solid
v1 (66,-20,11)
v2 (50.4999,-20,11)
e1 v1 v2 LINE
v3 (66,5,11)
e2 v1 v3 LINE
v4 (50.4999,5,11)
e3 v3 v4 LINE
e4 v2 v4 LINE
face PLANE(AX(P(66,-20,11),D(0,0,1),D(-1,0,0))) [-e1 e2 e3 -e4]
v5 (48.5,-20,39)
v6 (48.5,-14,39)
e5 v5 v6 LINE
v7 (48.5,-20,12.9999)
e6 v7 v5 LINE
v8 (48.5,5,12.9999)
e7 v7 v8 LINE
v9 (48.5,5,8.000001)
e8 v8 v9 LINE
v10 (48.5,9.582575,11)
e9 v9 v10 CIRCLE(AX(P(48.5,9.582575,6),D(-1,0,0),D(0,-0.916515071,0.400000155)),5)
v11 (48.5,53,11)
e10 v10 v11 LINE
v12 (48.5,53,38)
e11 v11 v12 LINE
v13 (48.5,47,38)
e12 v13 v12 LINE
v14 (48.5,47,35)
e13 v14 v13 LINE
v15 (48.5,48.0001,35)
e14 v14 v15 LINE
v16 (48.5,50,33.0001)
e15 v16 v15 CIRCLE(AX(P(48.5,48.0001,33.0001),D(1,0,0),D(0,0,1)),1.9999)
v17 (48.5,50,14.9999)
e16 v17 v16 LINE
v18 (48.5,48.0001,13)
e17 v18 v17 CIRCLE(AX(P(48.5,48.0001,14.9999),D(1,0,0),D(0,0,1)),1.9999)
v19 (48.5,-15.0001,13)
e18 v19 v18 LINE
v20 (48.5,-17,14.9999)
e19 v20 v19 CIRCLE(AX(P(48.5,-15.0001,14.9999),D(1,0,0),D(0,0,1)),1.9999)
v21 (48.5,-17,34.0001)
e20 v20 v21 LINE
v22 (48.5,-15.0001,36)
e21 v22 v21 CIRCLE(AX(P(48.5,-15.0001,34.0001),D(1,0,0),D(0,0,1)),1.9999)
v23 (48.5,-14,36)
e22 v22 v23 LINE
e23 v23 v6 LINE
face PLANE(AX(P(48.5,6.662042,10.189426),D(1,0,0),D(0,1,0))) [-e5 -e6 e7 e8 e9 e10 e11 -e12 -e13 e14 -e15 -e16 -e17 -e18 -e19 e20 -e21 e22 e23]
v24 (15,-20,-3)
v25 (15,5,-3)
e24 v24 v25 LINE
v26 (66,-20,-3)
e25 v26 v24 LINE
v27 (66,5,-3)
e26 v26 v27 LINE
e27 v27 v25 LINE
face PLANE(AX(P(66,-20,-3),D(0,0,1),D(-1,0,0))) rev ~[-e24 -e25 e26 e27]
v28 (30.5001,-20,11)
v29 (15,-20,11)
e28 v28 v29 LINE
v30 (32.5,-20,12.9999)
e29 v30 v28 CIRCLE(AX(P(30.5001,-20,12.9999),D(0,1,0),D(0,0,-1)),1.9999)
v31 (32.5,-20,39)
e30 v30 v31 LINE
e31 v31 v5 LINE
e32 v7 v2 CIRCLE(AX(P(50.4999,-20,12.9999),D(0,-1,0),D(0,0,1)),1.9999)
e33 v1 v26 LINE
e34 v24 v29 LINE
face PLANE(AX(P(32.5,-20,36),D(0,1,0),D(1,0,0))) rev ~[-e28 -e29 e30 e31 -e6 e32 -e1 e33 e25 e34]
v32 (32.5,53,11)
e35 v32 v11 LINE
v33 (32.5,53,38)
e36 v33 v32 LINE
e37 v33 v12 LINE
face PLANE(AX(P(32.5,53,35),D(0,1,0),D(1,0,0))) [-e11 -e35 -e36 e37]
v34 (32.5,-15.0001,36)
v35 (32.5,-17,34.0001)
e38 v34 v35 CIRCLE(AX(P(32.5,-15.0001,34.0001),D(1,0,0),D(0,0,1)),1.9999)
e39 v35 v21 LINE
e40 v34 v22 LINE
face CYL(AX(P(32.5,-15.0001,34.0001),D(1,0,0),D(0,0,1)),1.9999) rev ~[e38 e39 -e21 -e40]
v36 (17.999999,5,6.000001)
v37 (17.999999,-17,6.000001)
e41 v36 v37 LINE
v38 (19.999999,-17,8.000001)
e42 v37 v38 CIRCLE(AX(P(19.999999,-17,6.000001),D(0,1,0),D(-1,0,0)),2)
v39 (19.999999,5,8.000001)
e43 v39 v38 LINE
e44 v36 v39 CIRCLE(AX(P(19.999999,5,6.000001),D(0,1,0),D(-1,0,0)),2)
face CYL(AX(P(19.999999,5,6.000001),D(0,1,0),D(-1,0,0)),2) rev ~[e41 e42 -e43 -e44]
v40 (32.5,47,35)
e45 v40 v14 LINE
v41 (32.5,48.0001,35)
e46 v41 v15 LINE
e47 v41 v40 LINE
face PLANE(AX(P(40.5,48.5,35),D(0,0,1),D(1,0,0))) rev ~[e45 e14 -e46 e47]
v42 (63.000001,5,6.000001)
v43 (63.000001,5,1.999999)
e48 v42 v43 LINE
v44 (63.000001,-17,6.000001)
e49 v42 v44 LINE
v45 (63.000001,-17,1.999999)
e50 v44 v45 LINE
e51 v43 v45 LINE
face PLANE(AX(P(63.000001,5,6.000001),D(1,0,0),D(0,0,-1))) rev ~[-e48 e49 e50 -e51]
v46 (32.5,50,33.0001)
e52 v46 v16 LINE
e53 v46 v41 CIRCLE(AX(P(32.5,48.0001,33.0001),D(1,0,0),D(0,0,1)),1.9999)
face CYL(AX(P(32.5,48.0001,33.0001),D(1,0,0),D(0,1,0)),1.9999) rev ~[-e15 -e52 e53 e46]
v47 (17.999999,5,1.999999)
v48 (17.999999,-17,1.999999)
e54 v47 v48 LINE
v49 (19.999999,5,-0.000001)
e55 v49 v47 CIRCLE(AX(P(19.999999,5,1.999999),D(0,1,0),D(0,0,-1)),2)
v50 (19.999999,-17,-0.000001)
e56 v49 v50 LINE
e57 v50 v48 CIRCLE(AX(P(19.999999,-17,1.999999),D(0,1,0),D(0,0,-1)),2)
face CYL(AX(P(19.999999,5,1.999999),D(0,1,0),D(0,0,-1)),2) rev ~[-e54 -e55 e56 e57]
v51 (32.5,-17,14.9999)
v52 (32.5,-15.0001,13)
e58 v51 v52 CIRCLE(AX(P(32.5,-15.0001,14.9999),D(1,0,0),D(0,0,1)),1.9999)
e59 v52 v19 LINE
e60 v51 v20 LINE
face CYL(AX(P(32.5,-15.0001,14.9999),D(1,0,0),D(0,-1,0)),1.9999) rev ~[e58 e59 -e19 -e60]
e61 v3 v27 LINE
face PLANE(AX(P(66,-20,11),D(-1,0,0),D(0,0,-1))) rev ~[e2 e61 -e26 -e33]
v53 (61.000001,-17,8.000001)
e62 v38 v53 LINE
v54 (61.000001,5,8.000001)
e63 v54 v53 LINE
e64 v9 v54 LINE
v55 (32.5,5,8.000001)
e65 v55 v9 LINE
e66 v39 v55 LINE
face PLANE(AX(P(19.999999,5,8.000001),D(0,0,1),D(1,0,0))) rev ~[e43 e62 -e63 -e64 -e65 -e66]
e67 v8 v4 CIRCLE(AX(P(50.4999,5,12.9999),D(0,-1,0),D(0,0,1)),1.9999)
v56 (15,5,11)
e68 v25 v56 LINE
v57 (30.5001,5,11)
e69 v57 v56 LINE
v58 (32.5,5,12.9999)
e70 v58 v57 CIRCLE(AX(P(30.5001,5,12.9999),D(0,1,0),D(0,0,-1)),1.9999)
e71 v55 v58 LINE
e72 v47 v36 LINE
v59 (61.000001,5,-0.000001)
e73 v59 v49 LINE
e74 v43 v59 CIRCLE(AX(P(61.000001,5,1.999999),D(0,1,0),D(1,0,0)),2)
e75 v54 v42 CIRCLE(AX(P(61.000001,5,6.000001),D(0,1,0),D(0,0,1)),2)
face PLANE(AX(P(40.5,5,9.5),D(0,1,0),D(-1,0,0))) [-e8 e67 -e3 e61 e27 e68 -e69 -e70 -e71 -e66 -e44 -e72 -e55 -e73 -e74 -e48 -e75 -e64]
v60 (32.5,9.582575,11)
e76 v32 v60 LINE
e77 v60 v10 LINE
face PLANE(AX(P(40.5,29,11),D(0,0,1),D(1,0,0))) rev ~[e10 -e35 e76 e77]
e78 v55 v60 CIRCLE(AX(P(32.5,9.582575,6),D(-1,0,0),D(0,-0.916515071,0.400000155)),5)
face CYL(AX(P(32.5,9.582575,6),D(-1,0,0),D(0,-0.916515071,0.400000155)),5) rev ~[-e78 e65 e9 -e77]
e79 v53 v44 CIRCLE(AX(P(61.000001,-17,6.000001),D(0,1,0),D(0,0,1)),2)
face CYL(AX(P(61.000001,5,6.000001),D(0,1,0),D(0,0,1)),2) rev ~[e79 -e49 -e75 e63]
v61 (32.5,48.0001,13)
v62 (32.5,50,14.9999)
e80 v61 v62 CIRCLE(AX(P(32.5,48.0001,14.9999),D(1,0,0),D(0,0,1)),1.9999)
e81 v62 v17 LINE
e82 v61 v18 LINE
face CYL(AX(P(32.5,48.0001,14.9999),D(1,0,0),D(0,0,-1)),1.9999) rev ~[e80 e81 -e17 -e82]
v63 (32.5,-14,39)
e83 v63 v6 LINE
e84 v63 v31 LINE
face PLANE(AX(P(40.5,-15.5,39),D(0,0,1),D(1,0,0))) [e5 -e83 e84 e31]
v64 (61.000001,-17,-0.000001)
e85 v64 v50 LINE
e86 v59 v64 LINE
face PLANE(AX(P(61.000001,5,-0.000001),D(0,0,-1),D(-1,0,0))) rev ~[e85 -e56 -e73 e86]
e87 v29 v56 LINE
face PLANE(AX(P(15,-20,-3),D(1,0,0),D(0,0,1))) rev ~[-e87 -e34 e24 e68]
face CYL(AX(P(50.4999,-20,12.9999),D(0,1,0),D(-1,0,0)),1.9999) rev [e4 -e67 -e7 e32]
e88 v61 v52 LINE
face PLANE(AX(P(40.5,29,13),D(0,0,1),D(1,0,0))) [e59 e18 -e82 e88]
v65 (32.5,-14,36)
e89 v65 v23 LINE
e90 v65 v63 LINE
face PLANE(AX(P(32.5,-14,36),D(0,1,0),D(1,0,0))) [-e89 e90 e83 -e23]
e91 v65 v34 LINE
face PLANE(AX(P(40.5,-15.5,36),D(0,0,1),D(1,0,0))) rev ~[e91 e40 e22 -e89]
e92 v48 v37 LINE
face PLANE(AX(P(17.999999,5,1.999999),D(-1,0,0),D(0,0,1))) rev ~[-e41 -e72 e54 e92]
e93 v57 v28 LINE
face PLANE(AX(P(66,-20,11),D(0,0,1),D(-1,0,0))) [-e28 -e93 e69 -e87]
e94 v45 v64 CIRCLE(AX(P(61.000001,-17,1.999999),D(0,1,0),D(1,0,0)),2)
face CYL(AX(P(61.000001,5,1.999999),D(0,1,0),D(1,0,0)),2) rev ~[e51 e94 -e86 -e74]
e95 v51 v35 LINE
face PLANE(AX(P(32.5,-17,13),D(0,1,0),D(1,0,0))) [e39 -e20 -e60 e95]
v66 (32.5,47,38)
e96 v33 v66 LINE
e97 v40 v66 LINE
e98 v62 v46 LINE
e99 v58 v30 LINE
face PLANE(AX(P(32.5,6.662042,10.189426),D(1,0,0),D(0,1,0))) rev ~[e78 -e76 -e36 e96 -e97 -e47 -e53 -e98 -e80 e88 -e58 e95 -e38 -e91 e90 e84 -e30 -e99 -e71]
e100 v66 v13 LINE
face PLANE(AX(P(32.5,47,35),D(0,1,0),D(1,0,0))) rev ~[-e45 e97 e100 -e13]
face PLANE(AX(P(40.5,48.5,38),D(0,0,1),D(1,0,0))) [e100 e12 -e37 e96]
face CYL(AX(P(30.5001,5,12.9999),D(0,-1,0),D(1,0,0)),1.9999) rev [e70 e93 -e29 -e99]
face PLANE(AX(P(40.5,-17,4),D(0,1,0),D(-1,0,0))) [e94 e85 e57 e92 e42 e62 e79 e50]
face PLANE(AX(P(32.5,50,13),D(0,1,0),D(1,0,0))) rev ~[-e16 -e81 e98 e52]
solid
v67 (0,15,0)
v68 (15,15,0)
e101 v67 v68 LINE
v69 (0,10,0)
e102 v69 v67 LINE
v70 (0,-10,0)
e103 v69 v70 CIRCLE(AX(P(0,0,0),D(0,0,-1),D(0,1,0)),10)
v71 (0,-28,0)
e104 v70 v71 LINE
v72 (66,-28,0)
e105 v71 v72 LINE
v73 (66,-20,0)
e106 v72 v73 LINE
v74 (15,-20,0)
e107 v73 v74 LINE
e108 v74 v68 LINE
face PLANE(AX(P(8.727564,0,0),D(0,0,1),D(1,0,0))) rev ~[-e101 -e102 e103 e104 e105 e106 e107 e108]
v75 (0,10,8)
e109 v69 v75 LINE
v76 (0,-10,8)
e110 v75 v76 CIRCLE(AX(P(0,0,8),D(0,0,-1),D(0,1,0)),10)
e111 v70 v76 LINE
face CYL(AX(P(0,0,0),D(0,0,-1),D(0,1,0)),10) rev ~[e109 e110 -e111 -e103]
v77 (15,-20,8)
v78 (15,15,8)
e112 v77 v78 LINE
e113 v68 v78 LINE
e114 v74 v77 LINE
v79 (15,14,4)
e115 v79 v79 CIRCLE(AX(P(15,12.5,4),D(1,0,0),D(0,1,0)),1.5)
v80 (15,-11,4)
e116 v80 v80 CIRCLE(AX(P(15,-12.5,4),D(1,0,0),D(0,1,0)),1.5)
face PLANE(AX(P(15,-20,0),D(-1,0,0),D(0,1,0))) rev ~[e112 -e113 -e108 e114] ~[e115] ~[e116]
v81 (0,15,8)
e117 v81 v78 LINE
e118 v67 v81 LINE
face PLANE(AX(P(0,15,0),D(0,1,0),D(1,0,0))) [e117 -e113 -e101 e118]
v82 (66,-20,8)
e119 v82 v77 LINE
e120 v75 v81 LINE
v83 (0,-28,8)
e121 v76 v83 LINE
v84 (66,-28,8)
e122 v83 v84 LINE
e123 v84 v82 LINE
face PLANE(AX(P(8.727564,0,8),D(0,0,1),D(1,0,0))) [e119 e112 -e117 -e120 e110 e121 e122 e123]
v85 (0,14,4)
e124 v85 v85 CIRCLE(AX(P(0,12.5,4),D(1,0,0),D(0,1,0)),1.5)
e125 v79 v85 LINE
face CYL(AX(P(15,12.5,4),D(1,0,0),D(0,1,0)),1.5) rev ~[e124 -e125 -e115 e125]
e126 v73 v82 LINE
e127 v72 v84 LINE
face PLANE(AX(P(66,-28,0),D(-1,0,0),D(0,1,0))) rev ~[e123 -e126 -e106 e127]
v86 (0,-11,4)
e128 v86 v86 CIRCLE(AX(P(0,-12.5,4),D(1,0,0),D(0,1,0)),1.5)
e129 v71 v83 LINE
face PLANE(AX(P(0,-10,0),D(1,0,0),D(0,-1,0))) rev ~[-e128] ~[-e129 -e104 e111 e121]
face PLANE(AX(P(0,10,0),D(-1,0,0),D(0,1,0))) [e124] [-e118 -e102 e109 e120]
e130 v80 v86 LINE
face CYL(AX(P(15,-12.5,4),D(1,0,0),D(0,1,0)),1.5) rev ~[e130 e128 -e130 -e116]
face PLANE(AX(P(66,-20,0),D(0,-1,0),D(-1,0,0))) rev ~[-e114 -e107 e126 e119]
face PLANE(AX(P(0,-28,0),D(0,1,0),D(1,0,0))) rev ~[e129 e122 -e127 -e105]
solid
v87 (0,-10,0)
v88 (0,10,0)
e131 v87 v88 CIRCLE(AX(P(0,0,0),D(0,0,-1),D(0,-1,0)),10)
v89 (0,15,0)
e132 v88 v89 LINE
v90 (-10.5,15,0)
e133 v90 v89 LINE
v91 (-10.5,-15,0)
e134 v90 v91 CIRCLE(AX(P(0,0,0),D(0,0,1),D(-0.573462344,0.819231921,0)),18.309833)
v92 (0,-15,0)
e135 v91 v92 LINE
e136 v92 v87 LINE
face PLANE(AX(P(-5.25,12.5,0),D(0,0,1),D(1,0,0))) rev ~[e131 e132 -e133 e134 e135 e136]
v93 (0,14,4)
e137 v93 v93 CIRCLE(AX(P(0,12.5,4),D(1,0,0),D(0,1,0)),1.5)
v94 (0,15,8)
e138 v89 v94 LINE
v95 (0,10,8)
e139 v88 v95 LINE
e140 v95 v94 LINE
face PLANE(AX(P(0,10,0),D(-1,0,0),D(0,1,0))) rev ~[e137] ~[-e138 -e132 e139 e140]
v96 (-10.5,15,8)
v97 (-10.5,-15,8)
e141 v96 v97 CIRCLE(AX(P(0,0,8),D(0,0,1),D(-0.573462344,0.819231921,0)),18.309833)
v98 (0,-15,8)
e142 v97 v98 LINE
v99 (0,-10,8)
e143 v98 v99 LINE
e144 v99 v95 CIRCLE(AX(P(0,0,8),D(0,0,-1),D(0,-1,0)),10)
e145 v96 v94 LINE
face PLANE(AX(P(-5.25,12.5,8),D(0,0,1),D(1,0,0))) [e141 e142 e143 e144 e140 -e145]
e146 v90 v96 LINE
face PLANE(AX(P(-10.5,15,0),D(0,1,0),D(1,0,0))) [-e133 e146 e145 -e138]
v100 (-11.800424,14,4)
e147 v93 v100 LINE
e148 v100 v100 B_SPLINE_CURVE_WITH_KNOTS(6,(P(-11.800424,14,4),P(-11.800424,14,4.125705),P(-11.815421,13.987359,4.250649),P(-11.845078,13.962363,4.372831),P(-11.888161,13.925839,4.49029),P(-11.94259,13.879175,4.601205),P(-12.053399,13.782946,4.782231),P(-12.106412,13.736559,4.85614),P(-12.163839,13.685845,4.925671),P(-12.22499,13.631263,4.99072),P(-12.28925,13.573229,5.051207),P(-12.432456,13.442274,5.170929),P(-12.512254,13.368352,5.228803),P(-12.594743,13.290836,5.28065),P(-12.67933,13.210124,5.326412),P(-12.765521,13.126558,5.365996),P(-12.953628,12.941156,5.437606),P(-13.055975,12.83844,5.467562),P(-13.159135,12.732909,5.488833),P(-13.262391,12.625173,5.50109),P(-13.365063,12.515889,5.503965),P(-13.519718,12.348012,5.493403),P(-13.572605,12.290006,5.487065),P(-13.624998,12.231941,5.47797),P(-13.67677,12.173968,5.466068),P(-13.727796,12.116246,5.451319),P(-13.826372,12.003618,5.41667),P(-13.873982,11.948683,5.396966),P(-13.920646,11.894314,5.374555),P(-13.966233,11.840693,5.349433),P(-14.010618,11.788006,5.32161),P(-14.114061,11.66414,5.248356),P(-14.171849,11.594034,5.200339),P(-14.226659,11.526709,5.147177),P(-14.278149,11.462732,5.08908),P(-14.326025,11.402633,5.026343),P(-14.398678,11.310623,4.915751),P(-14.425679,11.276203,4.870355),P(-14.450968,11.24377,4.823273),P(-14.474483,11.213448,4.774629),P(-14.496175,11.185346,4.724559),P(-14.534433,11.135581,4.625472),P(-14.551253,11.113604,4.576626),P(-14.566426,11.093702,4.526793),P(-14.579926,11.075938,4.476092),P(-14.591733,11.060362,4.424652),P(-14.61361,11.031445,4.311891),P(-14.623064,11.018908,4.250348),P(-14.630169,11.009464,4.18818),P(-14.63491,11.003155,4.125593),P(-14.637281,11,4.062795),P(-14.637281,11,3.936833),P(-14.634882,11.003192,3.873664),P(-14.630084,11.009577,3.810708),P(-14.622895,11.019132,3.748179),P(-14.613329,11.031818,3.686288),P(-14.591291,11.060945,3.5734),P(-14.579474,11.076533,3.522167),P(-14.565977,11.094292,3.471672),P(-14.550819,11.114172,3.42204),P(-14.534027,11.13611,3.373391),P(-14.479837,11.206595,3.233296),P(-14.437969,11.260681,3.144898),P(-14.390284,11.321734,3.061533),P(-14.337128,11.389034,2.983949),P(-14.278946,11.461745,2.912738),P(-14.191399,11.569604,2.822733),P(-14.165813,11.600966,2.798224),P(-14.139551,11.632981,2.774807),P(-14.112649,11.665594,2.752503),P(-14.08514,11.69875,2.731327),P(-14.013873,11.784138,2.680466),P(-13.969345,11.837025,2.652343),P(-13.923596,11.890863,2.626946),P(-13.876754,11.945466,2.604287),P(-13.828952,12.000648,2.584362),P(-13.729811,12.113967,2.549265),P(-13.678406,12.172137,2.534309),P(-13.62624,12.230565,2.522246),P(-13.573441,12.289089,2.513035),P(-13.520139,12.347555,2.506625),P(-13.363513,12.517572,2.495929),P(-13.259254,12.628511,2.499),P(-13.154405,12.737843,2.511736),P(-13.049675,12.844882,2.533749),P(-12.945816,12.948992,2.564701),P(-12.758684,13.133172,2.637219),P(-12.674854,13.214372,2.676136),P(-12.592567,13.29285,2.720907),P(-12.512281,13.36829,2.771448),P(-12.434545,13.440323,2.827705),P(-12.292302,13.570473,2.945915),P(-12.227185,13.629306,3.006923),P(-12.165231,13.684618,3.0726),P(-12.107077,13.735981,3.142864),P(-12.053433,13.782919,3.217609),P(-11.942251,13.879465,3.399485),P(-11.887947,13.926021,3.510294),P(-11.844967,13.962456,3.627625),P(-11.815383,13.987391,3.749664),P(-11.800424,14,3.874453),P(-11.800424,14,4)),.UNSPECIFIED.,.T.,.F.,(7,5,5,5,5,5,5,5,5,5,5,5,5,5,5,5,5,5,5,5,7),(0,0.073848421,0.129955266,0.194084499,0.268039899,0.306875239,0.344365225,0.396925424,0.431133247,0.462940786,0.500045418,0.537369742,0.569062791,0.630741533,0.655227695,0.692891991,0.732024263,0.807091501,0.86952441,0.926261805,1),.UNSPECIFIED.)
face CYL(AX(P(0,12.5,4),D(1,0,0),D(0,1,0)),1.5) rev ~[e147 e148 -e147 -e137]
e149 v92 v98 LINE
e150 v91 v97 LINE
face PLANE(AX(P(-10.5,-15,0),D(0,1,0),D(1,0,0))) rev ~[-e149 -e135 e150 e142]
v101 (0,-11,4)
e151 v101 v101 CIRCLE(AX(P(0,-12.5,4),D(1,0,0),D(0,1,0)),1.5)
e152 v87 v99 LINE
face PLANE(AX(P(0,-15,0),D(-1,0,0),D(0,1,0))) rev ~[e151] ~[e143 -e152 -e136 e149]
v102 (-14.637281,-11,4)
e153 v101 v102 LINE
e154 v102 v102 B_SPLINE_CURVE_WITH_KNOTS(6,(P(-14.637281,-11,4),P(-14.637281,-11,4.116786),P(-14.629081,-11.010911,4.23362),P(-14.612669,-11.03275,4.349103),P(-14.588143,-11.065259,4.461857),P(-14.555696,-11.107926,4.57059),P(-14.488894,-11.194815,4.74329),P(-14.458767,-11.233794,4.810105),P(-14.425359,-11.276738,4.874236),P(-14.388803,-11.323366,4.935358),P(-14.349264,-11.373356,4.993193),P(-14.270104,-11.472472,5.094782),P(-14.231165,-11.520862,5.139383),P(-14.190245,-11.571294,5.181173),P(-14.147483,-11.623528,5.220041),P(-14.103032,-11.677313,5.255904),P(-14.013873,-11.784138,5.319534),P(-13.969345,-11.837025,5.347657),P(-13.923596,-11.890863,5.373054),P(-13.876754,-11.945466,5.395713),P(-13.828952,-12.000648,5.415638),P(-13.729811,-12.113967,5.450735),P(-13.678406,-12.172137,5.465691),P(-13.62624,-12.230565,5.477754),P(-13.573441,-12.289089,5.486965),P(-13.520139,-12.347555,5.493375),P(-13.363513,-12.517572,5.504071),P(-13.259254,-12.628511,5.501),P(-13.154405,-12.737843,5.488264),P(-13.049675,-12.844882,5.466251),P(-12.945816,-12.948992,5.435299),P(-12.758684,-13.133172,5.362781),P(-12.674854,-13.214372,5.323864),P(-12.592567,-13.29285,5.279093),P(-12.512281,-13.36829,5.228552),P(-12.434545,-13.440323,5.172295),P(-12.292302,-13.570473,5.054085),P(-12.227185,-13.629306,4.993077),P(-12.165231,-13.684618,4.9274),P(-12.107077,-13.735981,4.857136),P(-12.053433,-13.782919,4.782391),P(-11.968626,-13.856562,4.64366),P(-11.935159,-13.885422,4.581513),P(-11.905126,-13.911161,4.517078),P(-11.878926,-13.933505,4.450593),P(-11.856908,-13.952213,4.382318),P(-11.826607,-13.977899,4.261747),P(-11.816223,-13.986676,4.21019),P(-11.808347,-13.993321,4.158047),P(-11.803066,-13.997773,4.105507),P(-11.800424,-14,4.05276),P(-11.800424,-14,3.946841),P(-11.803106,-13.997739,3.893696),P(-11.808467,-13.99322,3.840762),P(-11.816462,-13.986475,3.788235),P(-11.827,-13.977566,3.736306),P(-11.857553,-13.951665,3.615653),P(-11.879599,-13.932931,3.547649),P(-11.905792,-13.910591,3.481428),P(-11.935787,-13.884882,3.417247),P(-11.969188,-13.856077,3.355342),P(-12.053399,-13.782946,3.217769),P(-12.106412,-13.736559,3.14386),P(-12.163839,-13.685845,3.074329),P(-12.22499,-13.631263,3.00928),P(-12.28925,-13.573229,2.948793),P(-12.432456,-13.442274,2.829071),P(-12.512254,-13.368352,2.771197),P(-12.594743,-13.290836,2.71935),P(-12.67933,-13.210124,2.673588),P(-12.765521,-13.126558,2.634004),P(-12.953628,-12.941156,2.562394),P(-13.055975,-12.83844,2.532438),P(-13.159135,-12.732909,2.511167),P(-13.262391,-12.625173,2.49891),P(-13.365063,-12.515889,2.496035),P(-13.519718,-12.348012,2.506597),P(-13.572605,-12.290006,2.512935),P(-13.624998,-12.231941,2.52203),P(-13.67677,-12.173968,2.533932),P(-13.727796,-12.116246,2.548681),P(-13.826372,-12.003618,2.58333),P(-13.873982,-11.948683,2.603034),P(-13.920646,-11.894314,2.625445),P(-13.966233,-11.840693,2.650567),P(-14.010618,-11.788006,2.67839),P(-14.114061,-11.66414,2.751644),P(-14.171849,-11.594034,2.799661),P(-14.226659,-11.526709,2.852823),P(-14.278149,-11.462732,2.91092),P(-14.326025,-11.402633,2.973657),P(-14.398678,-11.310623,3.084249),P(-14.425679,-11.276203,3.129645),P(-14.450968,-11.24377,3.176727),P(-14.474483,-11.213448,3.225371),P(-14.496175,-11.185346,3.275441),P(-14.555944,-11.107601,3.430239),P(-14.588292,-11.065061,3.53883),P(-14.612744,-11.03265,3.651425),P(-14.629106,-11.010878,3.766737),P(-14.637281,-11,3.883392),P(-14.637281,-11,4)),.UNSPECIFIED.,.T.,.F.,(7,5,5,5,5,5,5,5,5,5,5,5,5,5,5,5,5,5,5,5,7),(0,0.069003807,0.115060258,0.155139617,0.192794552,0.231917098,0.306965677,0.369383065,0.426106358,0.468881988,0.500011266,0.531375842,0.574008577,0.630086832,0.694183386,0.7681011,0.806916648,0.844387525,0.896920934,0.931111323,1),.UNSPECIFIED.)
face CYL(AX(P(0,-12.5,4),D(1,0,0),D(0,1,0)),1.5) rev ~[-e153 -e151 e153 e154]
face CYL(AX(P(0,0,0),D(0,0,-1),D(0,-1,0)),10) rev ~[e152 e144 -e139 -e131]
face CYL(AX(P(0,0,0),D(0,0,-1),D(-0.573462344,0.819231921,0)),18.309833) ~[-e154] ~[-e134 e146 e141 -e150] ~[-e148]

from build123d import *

# Parameters (mm, degrees)
F0_W         = 10.5
F0_H         = 5
F1_DEPTH     = 8
F2_R         = 1.5
F3_DEPTH     = 14.6382812683
F4_W         = 15
F4_H         = 5
F5_DEPTH     = 8
F6_R         = 1.5
F7_DEPTH     = 15
F8_W         = 51
F8_H         = 3
F8_H_2       = 8
F9_DEPTH     = 25
F11_DEPTH    = 22
F12_W        = 16
F12_H        = 48
F12_H_2      = 25
F13_DEPTH    = 2
F14_W        = 16
F14_H        = 3
F15_DEPTH    = 22
F16_W        = 16
F16_H        = 3
F17_DEPTH    = 3
F18_W        = 16
F18_H        = 3
F19_DEPTH    = 23
F20_W        = 16
F20_H        = 3
F21_DEPTH    = 3
F22_R        = 1.9999
F24_T1_DEPTH = 16


# Not quite as in the source:
# - a fillet or chamfer that OpenCascade refuses, or shapes differently, is made with other operations: its cross-section is extruded or revolved along the edge and cut away or added
# - two fillets or chamfers of one size are made in one step
# - a fillet or chamfer is up to 0.001 mm smaller than in the source, because OpenCascade refuses the exact size
# - a feature names something its author has since deleted; it is built from what else it names


with BuildPart() as f1:
    # F0 (on Top) → F1 (new body)
    with BuildSketch(Plane.XY):
        with Locations((-5.25, 12.5)):
            Rectangle(F0_W, F0_H)
        with BuildLine():
            ThreePointArc((0, -10), (-10, 0), (0, 10))
            Line((0, 10), (-10.5, 10))
            Line((-10.5, 10), (-10.5, 15))
            ThreePointArc((-10.5, 15), (-18.3098334236, 0), (-10.5, -15))
            Line((-10.5, -15), (-10.5, -10))
            Line((-10.5, -10), (0, -10))
        make_face()
        with Locations((-5.25, -12.5)):
            Rectangle(F0_W, F0_H)
    extrude(amount=F1_DEPTH)

    # F2 (on face) → F3 (cut, through all)
    with BuildSketch(Plane.YZ):
        with Locations((12.5, 4)):
            Circle(F2_R)
        with Locations((-12.5, 4)):
            Circle(F2_R)
    extrude(amount=-F3_DEPTH, mode=Mode.SUBTRACT)


with BuildPart() as f5:
    # F4 (on Top) → F5 (new body)
    with BuildSketch(Plane.XY):
        with BuildLine():
            Line((15, 10), (0, 10))
            ThreePointArc((0, 10), (10, 0), (0, -10))
            Line((0, -10), (15, -10))
            Line((15, -10), (15, 10))
        make_face()
        with Locations((7.5, 12.5)):
            Rectangle(F4_W, F4_H)
        with Locations((7.5, -12.5)):
            Rectangle(F4_W, F4_H)
        with Locations((7.5, -17.5)):
            Rectangle(F4_W, F4_H)
        Polygon((15, -20), (0, -20), (0, -28), (66, -28), (66, -20), align=None)
    extrude(amount=F5_DEPTH)

    # F6 (on face) → F7 (cut, through all)
    with BuildSketch(Plane.YZ.offset(15)):
        with Locations((-12.5, 4)):
            Circle(F6_R)
        with Locations((12.5, 4)):
            Circle(F6_R)
    extrude(amount=-F7_DEPTH, mode=Mode.SUBTRACT)


with BuildPart() as f9:
    # F8 (on face) → F9 (new body)
    with BuildSketch(Plane(origin=(0, -20, 0), x_dir=(-1, 0, 0), z_dir=(0, 1, 0))):
        with Locations((-40.5, 9.5)):
            Rectangle(F8_W, F8_H)
        with Locations((-40.5, 4)):
            Rectangle(F8_W, F8_H_2)
        with Locations((-40.5, -1.5)):
            Rectangle(F8_W, F8_H)
    extrude(amount=F9_DEPTH)

    # F10 (on face) → F11 (cut)
    with BuildSketch(Plane(origin=(0, 5, 0), x_dir=(-1, 0, 0), z_dir=(0, 1, 0))):
        with BuildLine():
            Line((-17.9999992251, 1.9999992251), (-17.9999992251, 6.0000007749))
            ThreePointArc((-17.9999992251, 6.0000007749), (-18.5857856628, 7.4142143372), (-19.9999992251, 8.0000007749))
            Line((-19.9999992251, 8.0000007749), (-61.0000007749, 8.0000007749))
            ThreePointArc((-61.0000007749, 8.0000007749), (-62.4142143372, 7.4142143372), (-63.0000007749, 6.0000007749))
            Line((-63.0000007749, 6.0000007749), (-63.0000007749, 1.9999992251))
            ThreePointArc((-63.0000007749, 1.9999992251), (-62.4142143372, 0.5857856628), (-61.0000007749, -7.749e-07))
            Line((-61.0000007749, -7.749e-07), (-19.9999992251, -7.749e-07))
            ThreePointArc((-19.9999992251, -7.749e-07), (-18.5857856628, 0.5857856628), (-17.9999992251, 1.9999992251))
        make_face()
    extrude(amount=-F11_DEPTH, mode=Mode.SUBTRACT)

    # F12 (on face) → F13 (join)
    with BuildSketch(Plane.XY.offset(11)):
        with Locations((40.5, 29)):
            Rectangle(F12_W, F12_H)
        with Locations((40.5, -7.5)):
            Rectangle(F12_W, F12_H_2)
    extrude(amount=F13_DEPTH)

    # F14 (on face) → F15 (join)
    with BuildSketch(Plane.XY.offset(13)):
        with Locations((40.5, 51.5)):
            Rectangle(F14_W, F14_H)
    extrude(amount=F15_DEPTH)

    # F16 (on face) → F17 (join)
    with BuildSketch(Plane.XY.offset(35)):
        with Locations((40.5, 48.5)):
            Rectangle(F16_W, F16_H)
        with Locations((40.5, 51.5)):
            Rectangle(F16_W, F16_H)
    extrude(amount=F17_DEPTH)

    # F18 (on face) → F19 (join)
    with BuildSketch(Plane.XY.offset(13)):
        with Locations((40.5, -18.5)):
            Rectangle(F18_W, F18_H)
    extrude(amount=F19_DEPTH)

    # F20 (on face) → F21 (join)
    with BuildSketch(Plane.XY.offset(36)):
        with Locations((40.5, -15.5)):
            Rectangle(F20_W, F20_H)
        with Locations((40.5, -18.5)):
            Rectangle(F20_W, F20_H)
    extrude(amount=F21_DEPTH)

    # F22 (radius 2 in the source; OpenCascade refuses exactly that, so slightly less here)
    f22_edges = [f9.edges().sort_by_distance(p)[0] for p in [
        (32.5, -7.5, 11),
        (48.5, -7.5, 11),
        (40.5, 50, 35),
        (40.5, 50, 13),
        (40.5, -17, 13),
        (40.5, -17, 36),
    ]]
    fillet(f22_edges, radius=F22_R)

    # F24: fillet of radius 5 on 1 edges, made by hand

    # F24_s2 → F24_t1 (join)
    with BuildSketch(Plane.YZ.offset(32.5)):
        with BuildLine():
            ThreePointArc((5, 8.0000007749), (6.8439629229, 10.1833003642), (9.5825753568, 11))
            Line((9.5825753568, 11), (5, 11))
            Line((5, 11), (5, 8.0000007749))
        make_face()
    extrude(amount=F24_T1_DEPTH)


solid = Compound([f1.part, f5.part, f9.part])
